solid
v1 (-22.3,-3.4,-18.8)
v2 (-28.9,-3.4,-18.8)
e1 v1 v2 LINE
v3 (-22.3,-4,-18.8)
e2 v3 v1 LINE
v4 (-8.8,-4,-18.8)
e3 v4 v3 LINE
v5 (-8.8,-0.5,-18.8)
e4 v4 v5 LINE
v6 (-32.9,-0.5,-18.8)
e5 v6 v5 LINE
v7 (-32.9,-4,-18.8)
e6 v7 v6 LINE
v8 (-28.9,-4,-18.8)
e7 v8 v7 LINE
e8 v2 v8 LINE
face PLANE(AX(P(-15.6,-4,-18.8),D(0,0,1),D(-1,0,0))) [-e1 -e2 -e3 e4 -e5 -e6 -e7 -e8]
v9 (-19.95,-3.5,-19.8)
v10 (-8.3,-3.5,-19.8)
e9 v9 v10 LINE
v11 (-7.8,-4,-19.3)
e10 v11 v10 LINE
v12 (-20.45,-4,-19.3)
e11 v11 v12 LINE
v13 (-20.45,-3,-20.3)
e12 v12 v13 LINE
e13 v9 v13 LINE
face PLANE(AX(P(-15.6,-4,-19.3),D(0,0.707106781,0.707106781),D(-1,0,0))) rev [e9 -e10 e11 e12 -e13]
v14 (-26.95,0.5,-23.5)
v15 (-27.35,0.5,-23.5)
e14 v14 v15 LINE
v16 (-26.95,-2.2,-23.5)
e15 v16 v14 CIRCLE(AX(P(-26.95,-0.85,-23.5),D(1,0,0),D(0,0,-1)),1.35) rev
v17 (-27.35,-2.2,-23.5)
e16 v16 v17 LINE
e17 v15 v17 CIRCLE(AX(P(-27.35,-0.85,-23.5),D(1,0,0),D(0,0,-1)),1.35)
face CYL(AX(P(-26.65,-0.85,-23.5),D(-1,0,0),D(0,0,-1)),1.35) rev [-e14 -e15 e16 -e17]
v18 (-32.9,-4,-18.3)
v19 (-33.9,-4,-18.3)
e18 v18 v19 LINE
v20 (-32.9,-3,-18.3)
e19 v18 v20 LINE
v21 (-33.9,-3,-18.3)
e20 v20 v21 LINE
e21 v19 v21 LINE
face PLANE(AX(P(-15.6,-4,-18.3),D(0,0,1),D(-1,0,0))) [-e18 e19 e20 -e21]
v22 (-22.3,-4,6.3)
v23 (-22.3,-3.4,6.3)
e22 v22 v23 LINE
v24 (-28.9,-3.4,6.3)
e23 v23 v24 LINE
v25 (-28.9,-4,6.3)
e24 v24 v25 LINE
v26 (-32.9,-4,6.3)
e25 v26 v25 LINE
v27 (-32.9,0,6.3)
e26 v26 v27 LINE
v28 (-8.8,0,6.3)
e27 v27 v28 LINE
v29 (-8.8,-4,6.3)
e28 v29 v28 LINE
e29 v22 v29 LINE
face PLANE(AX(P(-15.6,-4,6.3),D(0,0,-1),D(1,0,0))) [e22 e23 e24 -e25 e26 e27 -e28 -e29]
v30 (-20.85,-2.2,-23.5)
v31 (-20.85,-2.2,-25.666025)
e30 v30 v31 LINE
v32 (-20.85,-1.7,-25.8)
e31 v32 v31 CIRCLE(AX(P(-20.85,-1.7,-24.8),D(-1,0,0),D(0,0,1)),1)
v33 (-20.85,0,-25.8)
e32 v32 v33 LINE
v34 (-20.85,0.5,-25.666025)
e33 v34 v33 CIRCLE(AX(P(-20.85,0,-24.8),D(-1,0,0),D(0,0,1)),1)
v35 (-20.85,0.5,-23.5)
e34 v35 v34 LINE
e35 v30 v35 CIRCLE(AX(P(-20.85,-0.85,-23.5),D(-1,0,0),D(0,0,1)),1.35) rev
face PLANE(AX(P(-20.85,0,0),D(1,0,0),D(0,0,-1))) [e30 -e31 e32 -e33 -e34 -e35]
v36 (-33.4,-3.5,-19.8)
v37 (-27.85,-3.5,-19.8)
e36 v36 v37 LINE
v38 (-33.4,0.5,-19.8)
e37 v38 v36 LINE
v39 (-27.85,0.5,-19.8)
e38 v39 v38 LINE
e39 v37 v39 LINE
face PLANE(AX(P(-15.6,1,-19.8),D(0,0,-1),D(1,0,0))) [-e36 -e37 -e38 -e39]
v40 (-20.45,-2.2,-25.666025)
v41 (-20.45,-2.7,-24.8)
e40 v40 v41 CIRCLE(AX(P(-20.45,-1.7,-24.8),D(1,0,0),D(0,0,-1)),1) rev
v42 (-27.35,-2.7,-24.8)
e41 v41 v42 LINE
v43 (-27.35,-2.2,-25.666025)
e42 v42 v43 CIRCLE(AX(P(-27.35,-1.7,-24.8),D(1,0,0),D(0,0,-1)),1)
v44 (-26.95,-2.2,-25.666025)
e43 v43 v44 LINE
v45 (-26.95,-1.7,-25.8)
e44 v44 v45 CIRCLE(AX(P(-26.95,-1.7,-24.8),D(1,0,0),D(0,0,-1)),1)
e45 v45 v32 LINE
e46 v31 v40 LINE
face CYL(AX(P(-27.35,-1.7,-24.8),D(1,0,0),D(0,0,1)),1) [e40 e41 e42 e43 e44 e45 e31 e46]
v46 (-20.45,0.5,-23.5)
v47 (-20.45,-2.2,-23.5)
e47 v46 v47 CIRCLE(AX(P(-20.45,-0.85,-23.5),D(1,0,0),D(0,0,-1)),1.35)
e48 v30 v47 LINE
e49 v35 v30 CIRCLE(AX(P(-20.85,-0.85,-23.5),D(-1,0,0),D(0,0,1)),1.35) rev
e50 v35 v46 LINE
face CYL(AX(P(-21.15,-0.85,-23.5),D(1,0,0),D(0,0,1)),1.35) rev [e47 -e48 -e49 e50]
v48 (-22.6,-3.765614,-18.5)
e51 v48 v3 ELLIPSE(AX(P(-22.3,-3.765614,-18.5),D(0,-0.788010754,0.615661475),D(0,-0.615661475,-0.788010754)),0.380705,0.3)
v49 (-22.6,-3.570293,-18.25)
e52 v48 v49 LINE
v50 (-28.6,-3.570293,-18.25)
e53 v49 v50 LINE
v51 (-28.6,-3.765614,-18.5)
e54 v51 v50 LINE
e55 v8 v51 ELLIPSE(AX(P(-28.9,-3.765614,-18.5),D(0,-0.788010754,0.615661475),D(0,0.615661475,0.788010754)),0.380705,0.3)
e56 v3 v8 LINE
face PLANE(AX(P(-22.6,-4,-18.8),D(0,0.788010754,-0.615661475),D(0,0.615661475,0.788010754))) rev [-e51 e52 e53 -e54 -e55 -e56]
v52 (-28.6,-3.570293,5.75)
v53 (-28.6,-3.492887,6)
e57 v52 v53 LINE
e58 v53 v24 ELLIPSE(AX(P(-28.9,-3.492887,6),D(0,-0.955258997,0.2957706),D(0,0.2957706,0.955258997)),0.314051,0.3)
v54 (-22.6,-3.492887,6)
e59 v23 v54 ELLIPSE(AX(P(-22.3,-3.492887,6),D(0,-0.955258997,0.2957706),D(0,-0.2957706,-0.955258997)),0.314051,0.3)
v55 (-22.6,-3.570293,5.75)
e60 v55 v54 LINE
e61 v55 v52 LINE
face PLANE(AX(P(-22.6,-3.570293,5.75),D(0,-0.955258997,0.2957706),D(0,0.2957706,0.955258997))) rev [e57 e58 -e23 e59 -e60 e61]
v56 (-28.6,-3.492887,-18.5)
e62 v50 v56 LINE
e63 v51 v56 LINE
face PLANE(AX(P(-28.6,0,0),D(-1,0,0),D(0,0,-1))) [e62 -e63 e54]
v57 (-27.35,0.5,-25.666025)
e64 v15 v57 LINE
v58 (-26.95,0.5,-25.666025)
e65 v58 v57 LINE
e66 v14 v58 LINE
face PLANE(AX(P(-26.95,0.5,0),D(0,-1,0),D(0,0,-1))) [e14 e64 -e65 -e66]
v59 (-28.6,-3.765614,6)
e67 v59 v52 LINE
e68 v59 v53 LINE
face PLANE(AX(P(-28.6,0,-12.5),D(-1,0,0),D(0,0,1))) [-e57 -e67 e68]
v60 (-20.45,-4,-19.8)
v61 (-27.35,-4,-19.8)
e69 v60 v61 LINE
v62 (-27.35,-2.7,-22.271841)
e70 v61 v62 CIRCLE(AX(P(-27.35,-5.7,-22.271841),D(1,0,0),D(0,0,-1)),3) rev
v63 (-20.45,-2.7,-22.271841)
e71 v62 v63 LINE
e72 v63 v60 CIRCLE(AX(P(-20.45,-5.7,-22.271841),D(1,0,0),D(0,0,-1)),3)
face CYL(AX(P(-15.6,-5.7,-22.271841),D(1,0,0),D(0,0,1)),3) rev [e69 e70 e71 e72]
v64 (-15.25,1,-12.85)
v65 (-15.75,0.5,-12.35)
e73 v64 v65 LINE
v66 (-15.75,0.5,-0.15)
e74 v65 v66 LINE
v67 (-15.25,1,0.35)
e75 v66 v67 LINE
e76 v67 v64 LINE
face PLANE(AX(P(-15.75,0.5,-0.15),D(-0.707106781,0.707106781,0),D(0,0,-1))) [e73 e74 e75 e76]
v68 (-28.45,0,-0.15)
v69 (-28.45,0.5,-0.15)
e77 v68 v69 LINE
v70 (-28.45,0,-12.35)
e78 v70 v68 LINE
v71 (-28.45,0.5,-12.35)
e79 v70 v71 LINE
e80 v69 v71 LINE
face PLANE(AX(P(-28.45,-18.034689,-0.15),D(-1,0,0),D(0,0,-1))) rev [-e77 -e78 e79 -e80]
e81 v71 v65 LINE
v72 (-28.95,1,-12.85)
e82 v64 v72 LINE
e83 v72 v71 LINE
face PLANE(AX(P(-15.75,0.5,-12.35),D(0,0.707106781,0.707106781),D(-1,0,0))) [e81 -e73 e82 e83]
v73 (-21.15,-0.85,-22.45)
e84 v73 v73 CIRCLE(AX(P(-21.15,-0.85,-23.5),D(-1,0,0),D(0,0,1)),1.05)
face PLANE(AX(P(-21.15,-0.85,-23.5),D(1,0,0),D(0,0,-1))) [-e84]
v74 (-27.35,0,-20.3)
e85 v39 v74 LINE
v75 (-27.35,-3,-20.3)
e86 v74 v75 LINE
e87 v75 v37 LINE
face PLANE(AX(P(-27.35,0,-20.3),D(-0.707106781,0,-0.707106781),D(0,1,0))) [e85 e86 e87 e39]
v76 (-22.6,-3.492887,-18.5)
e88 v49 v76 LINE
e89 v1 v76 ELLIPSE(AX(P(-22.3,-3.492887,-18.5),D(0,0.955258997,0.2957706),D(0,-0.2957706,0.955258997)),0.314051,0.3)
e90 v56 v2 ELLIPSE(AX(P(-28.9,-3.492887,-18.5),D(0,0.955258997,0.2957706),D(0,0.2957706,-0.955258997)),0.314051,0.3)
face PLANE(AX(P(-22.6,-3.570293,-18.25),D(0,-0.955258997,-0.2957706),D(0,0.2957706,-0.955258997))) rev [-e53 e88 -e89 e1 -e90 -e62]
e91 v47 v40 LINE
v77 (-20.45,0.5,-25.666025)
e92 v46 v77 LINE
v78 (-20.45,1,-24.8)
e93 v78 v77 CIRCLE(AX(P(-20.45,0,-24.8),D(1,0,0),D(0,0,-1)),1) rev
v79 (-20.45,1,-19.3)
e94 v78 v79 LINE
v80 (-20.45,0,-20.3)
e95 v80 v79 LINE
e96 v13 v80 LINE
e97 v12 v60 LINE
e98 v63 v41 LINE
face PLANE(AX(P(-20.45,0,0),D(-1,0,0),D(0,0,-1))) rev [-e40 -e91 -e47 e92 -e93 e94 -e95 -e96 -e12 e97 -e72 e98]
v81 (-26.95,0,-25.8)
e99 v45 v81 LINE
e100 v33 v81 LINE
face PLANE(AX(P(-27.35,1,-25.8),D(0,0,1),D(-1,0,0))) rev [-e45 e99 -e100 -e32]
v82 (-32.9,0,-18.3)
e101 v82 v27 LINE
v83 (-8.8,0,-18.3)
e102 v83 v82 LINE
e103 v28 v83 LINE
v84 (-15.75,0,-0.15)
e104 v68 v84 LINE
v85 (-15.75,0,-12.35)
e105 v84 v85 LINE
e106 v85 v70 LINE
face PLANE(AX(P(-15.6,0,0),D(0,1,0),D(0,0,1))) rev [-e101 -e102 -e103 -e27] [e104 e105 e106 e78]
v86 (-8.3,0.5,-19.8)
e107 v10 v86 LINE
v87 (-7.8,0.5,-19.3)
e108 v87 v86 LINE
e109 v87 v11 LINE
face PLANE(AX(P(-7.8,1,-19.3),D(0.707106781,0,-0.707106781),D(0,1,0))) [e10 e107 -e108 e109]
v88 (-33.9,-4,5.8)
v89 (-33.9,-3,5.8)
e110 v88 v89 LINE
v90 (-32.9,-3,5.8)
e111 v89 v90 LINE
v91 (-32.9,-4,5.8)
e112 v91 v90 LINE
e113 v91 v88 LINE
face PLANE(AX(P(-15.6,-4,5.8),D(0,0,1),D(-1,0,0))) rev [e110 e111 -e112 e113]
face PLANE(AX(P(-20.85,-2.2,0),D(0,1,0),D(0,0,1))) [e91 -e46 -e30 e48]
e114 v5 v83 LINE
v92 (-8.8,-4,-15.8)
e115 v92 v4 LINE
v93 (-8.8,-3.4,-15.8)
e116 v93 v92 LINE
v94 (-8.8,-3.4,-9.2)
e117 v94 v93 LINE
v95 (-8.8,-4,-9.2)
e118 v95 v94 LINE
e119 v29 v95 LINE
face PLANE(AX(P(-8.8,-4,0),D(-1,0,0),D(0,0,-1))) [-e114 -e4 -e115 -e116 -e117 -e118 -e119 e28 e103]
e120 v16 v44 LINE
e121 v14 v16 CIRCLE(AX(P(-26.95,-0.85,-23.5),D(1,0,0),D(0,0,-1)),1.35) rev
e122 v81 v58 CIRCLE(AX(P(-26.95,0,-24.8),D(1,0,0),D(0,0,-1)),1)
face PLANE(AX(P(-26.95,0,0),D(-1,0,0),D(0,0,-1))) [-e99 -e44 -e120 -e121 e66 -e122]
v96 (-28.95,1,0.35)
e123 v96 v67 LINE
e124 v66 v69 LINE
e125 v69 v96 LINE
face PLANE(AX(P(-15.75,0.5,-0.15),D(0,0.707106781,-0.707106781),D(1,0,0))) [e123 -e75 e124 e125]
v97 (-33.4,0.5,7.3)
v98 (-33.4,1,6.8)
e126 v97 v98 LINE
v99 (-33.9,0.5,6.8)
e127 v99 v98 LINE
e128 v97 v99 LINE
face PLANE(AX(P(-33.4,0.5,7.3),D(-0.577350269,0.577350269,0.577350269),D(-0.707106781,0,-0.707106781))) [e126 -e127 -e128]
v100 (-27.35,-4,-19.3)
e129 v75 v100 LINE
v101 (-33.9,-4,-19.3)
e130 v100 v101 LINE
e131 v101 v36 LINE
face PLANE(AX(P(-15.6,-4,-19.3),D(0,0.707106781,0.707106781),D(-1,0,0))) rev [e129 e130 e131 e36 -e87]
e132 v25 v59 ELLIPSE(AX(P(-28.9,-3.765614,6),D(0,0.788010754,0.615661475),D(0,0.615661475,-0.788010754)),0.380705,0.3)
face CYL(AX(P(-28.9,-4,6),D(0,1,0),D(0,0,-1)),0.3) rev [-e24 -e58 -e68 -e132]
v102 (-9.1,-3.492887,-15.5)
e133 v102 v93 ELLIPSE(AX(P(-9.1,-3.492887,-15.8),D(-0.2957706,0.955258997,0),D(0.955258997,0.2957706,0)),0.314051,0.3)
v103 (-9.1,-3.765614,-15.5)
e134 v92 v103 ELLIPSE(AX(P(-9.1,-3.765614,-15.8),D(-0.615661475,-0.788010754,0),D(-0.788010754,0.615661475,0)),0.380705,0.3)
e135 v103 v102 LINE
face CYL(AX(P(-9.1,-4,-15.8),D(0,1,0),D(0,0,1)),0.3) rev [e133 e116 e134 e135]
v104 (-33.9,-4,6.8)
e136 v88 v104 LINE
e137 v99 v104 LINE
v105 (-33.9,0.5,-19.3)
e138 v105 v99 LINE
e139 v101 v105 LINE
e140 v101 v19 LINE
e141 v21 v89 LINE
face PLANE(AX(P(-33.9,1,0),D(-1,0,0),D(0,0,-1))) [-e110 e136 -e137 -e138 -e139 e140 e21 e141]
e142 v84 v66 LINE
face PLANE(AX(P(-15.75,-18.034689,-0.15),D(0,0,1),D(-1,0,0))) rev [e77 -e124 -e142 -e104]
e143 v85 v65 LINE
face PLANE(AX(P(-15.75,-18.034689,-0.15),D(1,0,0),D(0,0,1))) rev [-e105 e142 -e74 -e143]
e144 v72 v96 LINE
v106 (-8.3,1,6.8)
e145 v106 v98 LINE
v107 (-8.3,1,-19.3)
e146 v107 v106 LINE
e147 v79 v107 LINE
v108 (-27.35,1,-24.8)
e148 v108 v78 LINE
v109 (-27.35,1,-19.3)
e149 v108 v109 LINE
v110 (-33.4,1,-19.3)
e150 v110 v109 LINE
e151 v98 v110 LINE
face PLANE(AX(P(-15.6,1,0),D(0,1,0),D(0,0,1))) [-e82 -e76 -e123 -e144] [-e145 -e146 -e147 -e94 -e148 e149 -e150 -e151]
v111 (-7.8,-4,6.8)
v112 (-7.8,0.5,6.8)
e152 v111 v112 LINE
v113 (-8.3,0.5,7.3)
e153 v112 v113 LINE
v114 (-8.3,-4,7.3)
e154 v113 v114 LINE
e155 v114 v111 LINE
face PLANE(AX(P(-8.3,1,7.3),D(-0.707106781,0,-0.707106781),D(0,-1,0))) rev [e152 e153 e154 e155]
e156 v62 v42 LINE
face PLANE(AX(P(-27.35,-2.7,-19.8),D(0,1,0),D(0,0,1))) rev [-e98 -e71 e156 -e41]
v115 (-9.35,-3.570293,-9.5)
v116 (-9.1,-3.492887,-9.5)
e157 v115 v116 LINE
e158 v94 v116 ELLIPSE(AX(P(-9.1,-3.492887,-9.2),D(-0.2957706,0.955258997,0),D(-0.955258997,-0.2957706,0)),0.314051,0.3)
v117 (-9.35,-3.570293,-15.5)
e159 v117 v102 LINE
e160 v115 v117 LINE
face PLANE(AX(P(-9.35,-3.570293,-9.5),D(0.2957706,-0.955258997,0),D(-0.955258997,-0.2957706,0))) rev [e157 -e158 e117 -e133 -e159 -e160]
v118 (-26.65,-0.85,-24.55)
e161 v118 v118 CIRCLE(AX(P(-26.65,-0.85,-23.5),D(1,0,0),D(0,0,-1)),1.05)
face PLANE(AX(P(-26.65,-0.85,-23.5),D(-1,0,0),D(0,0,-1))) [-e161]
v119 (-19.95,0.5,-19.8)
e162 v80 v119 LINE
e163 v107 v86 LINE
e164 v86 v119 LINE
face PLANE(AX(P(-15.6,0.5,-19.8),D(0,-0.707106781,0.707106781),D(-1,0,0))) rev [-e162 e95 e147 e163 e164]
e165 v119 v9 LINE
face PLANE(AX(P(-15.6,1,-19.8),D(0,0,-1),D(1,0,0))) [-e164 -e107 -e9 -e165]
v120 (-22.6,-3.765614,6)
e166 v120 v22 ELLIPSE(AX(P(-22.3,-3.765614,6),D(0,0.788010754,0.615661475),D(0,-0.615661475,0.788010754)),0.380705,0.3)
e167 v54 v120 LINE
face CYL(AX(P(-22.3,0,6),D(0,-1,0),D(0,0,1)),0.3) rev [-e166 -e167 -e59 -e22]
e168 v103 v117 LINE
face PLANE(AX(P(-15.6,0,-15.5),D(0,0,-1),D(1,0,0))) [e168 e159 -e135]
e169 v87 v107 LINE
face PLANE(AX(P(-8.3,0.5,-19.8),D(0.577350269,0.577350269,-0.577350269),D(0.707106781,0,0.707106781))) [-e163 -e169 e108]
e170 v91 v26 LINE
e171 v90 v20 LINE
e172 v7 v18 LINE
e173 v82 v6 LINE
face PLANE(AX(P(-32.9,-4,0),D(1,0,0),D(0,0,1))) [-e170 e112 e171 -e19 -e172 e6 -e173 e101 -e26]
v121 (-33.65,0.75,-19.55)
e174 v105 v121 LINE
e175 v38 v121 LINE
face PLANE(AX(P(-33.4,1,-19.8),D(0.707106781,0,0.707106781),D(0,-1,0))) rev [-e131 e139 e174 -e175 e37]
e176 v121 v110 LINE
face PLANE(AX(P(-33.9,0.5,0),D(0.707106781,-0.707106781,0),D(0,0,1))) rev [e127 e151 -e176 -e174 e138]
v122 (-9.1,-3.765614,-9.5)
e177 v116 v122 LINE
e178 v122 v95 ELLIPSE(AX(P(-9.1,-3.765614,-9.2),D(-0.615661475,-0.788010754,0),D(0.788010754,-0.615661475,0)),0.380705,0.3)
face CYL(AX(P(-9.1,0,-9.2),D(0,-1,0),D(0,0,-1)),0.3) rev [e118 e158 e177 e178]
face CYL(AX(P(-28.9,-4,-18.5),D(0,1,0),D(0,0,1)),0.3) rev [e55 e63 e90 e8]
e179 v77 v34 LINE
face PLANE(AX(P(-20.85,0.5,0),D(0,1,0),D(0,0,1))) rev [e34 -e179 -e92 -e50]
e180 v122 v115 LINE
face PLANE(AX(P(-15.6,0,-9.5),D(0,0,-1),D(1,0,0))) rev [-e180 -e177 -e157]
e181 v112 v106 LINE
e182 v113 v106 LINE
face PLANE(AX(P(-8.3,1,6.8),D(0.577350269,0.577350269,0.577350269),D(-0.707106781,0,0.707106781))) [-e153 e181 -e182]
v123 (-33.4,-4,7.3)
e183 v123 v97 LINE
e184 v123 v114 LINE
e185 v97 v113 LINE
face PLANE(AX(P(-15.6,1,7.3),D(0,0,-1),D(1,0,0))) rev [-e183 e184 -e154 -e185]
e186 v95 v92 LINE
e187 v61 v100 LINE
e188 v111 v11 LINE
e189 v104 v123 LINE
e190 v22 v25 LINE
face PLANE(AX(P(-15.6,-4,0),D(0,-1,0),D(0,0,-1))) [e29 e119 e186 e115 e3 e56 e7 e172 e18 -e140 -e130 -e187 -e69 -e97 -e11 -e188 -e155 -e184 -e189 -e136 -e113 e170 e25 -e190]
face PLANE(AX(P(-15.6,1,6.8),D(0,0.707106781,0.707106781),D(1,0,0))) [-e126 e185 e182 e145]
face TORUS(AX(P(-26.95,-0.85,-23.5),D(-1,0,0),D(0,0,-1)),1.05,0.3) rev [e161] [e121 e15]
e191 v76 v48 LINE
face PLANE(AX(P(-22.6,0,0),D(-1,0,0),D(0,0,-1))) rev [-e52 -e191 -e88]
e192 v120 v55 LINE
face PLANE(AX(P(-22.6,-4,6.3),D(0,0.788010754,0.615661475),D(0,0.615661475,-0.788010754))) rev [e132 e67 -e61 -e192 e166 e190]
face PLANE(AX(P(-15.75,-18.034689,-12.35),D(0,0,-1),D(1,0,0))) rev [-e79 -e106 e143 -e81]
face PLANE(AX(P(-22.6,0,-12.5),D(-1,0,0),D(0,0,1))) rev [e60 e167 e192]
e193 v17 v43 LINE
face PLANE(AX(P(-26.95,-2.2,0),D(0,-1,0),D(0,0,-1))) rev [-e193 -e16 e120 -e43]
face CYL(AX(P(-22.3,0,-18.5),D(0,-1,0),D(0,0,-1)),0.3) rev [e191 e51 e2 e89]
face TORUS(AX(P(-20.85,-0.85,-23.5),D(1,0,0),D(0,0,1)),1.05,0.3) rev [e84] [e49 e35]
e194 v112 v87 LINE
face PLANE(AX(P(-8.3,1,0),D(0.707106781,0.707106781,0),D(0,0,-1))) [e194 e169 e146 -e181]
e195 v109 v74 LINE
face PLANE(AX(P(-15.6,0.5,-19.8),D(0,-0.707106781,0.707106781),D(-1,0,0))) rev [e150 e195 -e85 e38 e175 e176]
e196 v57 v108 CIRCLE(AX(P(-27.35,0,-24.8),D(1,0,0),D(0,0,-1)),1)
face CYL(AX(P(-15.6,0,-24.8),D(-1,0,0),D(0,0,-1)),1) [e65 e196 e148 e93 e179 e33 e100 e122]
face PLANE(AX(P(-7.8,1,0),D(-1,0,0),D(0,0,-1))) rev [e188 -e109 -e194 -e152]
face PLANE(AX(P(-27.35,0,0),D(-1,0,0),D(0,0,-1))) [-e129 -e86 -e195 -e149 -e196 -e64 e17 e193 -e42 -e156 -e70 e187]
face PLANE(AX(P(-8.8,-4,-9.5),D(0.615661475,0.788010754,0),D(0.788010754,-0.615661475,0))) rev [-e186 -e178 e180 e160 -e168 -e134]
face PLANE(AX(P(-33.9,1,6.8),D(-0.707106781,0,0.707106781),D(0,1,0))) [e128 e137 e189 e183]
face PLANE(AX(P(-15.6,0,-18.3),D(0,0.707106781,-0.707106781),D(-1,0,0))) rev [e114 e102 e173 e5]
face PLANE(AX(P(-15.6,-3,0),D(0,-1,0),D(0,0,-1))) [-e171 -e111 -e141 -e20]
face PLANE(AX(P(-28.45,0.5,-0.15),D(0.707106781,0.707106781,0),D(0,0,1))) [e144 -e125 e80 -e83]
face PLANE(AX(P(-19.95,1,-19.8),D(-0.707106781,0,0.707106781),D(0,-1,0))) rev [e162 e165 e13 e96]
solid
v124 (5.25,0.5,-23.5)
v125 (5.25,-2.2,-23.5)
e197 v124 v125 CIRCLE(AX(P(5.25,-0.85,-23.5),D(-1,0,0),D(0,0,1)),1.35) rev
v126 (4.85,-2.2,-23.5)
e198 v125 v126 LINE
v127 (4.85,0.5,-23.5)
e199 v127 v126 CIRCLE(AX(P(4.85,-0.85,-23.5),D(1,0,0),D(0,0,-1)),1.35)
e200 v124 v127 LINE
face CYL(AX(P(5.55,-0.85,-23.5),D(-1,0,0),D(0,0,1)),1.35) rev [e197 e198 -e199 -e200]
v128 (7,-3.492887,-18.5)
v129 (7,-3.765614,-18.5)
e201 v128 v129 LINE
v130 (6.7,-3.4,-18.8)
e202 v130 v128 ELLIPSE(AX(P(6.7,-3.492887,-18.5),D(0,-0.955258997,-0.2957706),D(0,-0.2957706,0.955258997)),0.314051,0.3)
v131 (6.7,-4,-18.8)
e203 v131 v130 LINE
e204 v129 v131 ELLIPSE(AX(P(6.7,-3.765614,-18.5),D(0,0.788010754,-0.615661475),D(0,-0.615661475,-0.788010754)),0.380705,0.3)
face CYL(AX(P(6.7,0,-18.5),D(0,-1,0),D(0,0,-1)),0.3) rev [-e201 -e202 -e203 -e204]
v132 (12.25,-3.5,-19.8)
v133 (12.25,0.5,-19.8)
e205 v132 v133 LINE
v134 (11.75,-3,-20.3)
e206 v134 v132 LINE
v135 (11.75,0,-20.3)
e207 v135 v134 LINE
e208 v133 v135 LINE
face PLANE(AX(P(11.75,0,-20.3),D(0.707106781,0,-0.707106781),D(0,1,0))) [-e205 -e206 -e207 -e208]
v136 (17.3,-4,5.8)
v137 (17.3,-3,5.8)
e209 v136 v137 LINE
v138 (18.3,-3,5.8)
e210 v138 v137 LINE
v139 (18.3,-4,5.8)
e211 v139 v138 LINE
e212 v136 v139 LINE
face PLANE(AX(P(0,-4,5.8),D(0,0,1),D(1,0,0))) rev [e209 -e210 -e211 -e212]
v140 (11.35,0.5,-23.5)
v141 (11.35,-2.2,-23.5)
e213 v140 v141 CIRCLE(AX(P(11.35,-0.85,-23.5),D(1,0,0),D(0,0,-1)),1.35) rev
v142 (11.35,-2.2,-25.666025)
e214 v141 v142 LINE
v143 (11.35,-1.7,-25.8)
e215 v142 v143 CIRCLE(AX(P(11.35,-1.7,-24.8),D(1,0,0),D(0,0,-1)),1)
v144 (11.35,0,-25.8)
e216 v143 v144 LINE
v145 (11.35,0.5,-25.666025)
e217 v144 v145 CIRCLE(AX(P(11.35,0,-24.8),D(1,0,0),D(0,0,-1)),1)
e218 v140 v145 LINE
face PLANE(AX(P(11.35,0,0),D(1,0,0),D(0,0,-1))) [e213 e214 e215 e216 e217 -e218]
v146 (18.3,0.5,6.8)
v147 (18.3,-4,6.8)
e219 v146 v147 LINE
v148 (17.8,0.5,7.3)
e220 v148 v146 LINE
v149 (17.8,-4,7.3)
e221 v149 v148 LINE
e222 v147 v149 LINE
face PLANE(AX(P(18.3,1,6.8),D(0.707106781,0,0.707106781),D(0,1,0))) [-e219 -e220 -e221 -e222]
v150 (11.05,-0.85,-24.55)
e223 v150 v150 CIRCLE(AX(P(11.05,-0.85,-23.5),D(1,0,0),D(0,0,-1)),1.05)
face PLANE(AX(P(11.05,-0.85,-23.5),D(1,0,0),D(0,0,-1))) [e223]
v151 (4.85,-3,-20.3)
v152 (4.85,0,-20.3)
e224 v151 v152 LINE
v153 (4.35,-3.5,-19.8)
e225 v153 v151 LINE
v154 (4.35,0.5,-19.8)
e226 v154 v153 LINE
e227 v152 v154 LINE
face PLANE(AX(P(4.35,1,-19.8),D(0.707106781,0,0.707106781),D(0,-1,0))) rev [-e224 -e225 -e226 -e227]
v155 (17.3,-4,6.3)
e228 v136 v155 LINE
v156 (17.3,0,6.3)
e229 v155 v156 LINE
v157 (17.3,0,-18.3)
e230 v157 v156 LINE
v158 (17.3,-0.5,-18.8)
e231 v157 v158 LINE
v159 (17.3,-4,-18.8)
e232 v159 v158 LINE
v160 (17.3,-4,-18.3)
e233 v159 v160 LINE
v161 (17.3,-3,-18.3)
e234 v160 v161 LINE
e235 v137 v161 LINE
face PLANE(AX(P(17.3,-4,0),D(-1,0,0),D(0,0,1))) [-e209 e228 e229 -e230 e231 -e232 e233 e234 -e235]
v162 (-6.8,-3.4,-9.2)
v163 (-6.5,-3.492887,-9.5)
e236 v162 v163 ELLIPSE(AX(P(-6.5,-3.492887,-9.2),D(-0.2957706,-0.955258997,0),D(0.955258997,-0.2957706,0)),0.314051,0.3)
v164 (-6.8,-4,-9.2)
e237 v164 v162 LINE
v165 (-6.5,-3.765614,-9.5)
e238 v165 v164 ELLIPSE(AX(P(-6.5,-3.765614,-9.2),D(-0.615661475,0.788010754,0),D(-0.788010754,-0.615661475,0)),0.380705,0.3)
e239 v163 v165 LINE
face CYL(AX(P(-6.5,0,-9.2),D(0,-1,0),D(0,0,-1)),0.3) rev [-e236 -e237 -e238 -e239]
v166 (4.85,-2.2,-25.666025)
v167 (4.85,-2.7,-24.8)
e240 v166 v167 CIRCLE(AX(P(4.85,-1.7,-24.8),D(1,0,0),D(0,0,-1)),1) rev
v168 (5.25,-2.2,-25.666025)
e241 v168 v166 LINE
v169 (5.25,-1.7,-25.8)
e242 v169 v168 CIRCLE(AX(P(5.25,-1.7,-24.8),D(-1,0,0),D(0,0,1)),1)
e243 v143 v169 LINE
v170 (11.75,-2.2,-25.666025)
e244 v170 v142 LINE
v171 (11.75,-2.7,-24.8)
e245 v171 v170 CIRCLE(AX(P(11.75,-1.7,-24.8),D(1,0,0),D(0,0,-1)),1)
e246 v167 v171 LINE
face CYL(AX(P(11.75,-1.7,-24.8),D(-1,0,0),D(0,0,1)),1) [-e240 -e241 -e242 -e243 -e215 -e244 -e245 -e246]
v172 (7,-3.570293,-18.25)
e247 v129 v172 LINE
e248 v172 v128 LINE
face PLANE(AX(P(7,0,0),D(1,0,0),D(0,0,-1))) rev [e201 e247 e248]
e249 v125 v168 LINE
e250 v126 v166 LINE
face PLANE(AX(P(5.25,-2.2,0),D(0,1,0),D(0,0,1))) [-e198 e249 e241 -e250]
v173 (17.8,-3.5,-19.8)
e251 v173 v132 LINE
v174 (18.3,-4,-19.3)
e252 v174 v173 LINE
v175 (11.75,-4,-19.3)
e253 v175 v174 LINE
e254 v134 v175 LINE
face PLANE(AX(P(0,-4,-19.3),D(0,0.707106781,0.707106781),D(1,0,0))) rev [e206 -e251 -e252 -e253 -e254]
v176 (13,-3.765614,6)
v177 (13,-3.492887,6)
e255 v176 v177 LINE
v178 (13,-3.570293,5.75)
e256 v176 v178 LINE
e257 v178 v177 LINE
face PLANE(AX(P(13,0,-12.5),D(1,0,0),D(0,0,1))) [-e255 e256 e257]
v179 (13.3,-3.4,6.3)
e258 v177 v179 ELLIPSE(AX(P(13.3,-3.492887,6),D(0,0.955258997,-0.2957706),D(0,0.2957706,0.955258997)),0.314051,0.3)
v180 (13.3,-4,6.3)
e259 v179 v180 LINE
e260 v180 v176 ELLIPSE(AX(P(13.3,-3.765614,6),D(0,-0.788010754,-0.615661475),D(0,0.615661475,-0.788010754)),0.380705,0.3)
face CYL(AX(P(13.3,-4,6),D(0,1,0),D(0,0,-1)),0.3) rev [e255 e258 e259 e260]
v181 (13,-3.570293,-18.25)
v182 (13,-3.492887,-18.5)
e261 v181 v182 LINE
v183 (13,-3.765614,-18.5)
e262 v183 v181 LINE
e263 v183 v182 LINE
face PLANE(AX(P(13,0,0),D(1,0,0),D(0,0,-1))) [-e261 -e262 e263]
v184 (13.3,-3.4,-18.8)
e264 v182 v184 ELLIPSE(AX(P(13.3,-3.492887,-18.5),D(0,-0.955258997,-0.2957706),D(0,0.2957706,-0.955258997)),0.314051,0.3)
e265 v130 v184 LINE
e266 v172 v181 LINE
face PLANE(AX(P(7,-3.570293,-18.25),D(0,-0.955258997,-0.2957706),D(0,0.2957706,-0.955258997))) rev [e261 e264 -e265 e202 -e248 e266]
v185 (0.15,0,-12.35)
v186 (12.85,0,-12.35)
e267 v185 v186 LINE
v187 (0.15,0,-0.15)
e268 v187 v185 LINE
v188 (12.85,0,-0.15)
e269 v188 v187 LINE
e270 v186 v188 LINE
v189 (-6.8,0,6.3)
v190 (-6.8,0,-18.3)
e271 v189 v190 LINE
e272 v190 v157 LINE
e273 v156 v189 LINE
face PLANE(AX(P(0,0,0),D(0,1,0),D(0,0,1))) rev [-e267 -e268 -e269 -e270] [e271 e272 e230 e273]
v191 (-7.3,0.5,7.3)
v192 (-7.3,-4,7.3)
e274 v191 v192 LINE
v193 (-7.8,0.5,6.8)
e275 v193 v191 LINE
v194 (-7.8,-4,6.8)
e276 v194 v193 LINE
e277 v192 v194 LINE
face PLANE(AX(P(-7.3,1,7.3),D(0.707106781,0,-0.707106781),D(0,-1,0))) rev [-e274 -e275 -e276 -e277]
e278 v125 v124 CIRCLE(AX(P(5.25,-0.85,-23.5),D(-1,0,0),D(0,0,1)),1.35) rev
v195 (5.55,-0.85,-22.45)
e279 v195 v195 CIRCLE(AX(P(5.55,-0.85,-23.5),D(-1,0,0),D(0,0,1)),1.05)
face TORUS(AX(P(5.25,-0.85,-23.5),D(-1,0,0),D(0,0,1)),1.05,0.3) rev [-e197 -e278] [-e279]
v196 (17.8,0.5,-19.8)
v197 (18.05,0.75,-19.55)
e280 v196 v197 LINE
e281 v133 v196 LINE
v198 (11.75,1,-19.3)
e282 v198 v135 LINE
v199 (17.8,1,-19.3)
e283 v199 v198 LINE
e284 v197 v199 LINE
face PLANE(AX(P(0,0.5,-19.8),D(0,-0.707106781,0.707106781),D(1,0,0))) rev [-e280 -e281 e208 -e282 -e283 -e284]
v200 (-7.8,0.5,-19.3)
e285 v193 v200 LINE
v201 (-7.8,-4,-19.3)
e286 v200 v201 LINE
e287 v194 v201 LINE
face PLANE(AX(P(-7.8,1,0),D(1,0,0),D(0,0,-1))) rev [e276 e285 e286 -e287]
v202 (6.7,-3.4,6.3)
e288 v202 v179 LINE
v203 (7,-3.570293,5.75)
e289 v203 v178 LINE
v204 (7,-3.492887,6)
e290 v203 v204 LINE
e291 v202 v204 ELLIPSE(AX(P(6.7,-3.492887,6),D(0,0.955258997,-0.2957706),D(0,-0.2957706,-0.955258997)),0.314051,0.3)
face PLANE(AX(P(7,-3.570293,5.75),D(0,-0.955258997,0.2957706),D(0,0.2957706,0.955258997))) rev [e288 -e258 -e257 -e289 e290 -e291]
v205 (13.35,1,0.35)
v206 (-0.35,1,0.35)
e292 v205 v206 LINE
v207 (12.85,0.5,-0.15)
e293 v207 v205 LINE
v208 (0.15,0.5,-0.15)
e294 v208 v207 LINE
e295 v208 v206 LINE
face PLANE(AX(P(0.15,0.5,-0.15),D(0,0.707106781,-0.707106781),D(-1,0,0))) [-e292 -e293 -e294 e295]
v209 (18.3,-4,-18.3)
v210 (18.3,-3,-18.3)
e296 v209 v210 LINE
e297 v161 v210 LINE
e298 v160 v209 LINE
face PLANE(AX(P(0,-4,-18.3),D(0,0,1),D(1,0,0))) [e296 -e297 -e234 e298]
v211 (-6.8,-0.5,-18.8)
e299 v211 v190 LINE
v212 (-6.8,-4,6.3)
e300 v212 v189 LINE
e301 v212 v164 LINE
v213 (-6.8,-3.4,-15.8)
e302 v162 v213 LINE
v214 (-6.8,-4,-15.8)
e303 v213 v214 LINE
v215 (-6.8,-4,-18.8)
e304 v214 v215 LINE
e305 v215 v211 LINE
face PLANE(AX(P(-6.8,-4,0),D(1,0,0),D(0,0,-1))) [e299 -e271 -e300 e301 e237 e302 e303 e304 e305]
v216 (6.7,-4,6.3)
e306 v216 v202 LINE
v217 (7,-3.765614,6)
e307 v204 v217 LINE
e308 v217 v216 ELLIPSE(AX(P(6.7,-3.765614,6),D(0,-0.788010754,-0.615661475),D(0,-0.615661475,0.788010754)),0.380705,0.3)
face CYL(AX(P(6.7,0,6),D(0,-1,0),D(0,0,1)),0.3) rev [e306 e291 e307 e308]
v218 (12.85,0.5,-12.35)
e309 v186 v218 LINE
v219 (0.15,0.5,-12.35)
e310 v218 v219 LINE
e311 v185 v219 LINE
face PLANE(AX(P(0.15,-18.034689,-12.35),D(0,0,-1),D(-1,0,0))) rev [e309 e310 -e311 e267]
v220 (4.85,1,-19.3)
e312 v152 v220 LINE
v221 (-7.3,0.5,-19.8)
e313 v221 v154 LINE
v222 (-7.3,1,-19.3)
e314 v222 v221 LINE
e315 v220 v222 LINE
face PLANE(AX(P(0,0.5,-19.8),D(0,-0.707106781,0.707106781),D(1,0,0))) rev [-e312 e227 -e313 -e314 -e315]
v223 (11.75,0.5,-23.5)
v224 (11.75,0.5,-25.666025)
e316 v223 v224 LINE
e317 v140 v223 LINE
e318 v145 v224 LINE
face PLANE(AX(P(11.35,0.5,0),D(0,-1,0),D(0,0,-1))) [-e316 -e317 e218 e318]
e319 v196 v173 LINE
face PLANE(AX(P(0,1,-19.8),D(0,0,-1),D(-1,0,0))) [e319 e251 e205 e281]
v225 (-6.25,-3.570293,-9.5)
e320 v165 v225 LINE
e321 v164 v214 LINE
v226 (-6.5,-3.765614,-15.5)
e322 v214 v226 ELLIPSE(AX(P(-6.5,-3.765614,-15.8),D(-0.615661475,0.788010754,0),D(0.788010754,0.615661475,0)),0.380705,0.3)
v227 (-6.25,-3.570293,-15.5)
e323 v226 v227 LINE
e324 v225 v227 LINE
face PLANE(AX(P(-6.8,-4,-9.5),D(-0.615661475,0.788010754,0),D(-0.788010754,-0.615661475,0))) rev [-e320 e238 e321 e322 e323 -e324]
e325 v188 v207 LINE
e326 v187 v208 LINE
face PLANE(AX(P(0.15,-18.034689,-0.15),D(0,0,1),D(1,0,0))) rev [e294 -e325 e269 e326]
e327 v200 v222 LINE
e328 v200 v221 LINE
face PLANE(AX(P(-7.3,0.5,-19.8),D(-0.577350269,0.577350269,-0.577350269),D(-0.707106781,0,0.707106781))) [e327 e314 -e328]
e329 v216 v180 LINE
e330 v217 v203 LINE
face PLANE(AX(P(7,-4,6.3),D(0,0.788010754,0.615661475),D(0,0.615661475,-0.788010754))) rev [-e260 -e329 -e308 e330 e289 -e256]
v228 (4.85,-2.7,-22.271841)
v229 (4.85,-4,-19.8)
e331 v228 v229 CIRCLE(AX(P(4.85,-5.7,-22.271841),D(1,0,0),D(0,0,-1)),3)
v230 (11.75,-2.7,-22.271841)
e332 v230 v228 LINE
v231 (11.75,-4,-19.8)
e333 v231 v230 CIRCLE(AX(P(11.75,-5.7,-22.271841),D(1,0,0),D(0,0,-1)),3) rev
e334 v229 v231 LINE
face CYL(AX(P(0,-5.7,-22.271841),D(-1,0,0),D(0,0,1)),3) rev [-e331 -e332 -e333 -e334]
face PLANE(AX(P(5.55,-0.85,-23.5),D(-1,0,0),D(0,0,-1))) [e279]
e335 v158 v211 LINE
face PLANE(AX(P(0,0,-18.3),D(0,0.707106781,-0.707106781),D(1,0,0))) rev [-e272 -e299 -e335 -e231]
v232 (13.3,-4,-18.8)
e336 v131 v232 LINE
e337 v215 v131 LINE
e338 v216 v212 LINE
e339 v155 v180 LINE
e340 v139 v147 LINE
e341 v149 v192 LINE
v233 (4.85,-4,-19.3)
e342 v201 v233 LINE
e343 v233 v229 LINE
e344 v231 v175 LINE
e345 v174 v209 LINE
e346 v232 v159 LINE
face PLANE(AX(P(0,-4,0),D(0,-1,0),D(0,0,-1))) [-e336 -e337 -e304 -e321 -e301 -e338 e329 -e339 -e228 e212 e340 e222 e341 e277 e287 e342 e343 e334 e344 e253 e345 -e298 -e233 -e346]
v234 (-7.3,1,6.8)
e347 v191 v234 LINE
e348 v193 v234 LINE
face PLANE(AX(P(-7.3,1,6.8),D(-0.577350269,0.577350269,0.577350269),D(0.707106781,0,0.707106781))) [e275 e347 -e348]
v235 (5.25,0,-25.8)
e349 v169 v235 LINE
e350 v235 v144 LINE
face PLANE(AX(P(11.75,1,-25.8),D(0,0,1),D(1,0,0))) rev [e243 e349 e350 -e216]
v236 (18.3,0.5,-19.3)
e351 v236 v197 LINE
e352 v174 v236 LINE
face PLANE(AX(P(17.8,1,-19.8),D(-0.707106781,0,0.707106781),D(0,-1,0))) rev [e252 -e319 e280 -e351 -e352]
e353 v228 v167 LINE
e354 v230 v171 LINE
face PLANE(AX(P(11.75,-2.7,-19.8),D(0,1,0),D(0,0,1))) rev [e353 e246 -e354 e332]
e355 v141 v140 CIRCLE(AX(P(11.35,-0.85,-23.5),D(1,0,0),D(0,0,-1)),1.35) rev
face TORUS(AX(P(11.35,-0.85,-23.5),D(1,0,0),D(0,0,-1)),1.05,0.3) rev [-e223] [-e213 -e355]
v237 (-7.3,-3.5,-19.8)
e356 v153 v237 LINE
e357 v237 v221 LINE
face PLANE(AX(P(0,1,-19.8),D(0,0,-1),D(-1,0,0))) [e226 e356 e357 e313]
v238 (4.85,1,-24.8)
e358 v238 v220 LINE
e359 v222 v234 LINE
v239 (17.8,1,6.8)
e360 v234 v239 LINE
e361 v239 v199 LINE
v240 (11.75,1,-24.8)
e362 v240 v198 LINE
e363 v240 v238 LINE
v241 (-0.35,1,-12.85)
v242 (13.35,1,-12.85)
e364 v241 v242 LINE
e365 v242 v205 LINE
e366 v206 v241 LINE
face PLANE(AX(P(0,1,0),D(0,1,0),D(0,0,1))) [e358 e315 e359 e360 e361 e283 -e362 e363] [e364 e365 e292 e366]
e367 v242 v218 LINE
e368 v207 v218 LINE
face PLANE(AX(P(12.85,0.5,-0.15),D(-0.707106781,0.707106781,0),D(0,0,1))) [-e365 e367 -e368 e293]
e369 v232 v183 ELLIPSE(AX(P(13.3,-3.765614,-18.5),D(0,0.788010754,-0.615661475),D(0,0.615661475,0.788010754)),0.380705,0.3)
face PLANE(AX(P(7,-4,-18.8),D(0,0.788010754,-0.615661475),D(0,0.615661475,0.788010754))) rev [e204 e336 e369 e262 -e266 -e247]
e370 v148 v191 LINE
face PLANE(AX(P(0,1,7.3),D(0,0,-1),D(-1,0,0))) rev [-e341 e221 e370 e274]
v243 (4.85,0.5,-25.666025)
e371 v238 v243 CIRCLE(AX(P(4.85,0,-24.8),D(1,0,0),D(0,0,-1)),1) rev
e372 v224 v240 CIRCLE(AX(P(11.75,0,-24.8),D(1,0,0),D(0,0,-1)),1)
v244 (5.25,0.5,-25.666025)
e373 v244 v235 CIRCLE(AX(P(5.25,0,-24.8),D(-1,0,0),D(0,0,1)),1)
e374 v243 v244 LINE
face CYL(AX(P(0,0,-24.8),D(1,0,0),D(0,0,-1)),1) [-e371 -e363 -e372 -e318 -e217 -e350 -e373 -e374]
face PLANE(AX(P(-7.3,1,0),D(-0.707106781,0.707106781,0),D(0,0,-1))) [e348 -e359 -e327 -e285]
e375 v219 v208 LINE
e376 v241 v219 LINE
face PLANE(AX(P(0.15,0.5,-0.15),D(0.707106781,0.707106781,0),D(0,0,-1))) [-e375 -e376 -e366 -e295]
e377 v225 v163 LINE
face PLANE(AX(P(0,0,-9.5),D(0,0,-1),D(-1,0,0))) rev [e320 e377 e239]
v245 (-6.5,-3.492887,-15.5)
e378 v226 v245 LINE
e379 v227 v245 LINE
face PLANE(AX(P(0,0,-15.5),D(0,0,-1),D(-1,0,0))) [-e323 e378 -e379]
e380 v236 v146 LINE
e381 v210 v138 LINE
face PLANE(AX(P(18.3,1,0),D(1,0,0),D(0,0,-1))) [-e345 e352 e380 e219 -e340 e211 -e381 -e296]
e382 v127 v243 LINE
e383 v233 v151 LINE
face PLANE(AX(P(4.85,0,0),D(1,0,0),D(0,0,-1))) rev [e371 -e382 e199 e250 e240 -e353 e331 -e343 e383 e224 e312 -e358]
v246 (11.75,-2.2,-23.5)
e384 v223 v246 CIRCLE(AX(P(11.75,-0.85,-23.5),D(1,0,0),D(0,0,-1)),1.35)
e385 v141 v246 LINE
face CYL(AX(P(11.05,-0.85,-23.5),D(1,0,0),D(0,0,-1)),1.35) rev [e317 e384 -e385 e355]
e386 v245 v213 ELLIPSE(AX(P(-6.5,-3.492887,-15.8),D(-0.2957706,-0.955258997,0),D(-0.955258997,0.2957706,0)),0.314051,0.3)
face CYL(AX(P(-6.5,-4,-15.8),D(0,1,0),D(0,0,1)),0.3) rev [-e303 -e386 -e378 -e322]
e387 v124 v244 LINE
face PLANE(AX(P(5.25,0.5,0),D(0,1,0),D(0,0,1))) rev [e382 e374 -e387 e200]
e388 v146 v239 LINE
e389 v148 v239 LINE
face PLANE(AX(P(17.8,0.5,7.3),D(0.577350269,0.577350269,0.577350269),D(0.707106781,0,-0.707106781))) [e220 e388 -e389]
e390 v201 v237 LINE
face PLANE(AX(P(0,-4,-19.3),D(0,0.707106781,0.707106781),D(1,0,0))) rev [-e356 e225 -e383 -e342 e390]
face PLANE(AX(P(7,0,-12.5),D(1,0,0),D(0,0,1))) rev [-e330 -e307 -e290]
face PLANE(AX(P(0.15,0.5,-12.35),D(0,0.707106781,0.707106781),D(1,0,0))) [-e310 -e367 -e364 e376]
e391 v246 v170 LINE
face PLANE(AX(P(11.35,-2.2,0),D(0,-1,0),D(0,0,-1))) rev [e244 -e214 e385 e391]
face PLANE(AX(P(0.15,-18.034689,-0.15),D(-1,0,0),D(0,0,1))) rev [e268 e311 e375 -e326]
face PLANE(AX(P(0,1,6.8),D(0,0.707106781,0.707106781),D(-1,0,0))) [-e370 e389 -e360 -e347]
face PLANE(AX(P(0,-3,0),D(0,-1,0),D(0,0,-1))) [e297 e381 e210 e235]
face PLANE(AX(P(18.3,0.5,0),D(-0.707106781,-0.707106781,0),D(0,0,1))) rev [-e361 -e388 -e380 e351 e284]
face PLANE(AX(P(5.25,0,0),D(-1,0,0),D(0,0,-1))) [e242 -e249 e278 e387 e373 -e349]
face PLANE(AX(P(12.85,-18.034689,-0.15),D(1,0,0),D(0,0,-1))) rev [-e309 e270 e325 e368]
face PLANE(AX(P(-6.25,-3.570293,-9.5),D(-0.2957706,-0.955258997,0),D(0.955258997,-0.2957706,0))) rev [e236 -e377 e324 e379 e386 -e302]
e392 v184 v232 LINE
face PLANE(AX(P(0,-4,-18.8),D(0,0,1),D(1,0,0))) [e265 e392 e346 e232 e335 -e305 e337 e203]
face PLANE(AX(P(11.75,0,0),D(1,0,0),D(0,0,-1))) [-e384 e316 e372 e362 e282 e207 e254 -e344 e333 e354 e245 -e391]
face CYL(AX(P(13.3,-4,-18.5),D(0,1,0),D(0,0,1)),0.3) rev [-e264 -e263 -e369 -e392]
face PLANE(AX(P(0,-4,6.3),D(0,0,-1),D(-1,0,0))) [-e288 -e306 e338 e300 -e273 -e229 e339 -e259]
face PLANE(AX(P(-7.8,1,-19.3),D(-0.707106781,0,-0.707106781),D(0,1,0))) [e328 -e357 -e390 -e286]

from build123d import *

# Parameters (mm, degrees)
SKETCH1_W            = 26.1
SKETCH1_H            = 27.1
SKETCH1_W_2          = 13
SKETCH1_H_2          = 12.5
BOSS_EXTRUDE1_DEPTH  = 1
BOSS_EXTRUDE2_DEPTH  = 4
SKETCH3_W            = 1
SKETCH3_H            = 24.1
BOSS_EXTRUDE3_DEPTH  = 3
BOSS_EXTRUDE4_DEPTH  = 3
FILLET1_R            = 0.3
BOSS_EXTRUDE5_DEPTH  = 6
FILLET2_R            = 0.3
FILLET2_OF_MIRROR2_R = 0.3
SKETCH8_W            = 13
SKETCH8_H            = 12.5
SKETCH8_W_2          = 12.7
SKETCH8_H_2          = 12.2
BOSS_EXTRUDE6_DEPTH  = 1
SKETCH9_W            = 6
SKETCH9_H            = 3.7
BOSS_EXTRUDE7_DEPTH  = 3.45
SKETCH11_R           = 1.35
CUT_EXTRUDE1_DEPTH   = 0.7
FILLET3_R            = 0.3
CUT_EXTRUDE3_DEPTH   = 0.4
FILLET4_R            = 3
MIRROR3_START        = -2.2
MIRROR3_2_OUTLINE_W  = 0.4
MIRROR3_2_OUTLINE_H  = 2.3
MIRROR3_2_DEPTH      = 2.7
FILLET5_R            = 1
CHAMFER1_SIZE        = 0.5
CHAMFER2_SIZE        = 0.5
CHAMFER4_SIZE        = 0.5


with BuildPart() as part:
    # Sketch1 → Boss-Extrude1 (new body)
    with BuildSketch(Plane(origin=(0, 0, 0), x_dir=(1, 0, 0), z_dir=(0, 1, 0))):
        with Locations((5.25, 6.25)):
            Rectangle(SKETCH1_W, SKETCH1_H)
        with Locations((6.5, 6.25)):
            Rectangle(SKETCH1_W_2, SKETCH1_H_2, mode=Mode.SUBTRACT)
    extrude(amount=BOSS_EXTRUDE1_DEPTH)

    # Sketch2 → Boss-Extrude2 (add)
    with BuildSketch(Plane.XZ):
        Polygon((-7.8, 7.3), (-7.8, -19.8), (18.3, -19.8), (18.3, -18.3), (17.3, -18.3), (17.3, -18.8), (-6.8, -18.8), (-6.8, 6.3), (17.3, 6.3), (17.3, 5.8), (18.3, 5.8), (18.3, 7.3), align=None)
    extrude(amount=BOSS_EXTRUDE2_DEPTH)

    # Sketch3 → Boss-Extrude3 (add)
    with BuildSketch(Plane.XZ):
        with Locations((17.8, -6.25)):
            Rectangle(SKETCH3_W, SKETCH3_H)
    extrude(amount=BOSS_EXTRUDE3_DEPTH)

    # Sketch4 → Boss-Extrude4 (add, symmetric)
    with BuildSketch(Plane.XY.offset(-12.5)):
        Polygon((-6.8, -4), (-6.25, -3.570292905), (-6.8, -3.4), align=None)
    extrude(amount=BOSS_EXTRUDE4_DEPTH, both=True)

    # Fillet1
    # the kernel refuses this fillet: 0.3 mm, written as the material it adds along each edge
    with BuildSketch(Plane(origin=(-6.8, -2.65, -15.5), x_dir=(0, 0, -1), z_dir=(0, -1, 0))) as fillet1_piece_1_section:
        with BuildLine():
            CenterArc((FILLET1_R, FILLET1_R), FILLET1_R, 180, 90)
            Line((0, FILLET1_R), (0, 0))
            Line((0, 0), (FILLET1_R, 0))
        make_face()
    fillet1_piece_1 = extrude(amount=1.35, mode=Mode.PRIVATE)
    fillet1_piece_1 = split(fillet1_piece_1, bisect_by=Plane(origin=(-7.011903145, -3.334389814, -15.5), z_dir=(-0.2957706001702403, -0.9552589973797346, 0)), keep=Keep.TOP, mode=Mode.PRIVATE)
    fillet1_piece_1 = split(fillet1_piece_1, bisect_by=Plane(origin=(-6.145050385, -3.48829728, -15.5), z_dir=(-0.6156614753256621, 0.7880107536067191, 0)), keep=Keep.TOP, mode=Mode.PRIVATE)
    add(fillet1_piece_1)
    with BuildSketch(Plane(origin=(-6.8, -2.65, -9.5), x_dir=(0, 0, 1), z_dir=(0, -1, 0))) as fillet1_piece_2_section:
        with BuildLine():
            CenterArc((FILLET1_R, -FILLET1_R), FILLET1_R, 90, 90)
            Line((0, -FILLET1_R), (0, 0))
            Line((0, 0), (FILLET1_R, 0))
        make_face()
    fillet1_piece_2 = extrude(amount=1.35, mode=Mode.PRIVATE)
    fillet1_piece_2 = split(fillet1_piece_2, bisect_by=Plane(origin=(-7.011903145, -3.334389814, -9.5), z_dir=(-0.2957706001702403, -0.9552589973797346, 0)), keep=Keep.TOP, mode=Mode.PRIVATE)
    fillet1_piece_2 = split(fillet1_piece_2, bisect_by=Plane(origin=(-6.145050385, -3.48829728, -9.5), z_dir=(-0.6156614753256621, 0.7880107536067191, 0)), keep=Keep.TOP, mode=Mode.PRIVATE)
    add(fillet1_piece_2)

    # Sketch6 → Boss-Extrude5 (add)
    with BuildSketch(Plane.ZY.offset(-13)):
        Polygon((-18.8, -4), (-18.25, -3.570292905), (-18.8, -3.4), align=None)
    boss_extrude5 = extrude(amount=BOSS_EXTRUDE5_DEPTH)

    # Fillet2
    fillet2_edges = [part.edges().sort_by_distance(p)[0] for p in [
        (13, -3.7, -18.8),
        (7, -3.7, -18.8),
    ]]
    fillet(fillet2_edges, radius=FILLET2_R)

    # Mirror2: Boss-Extrude5 across plane
    add(boss_extrude5.mirror(Plane(origin=(0, 0, -6.25), x_dir=(1, 0, 0), z_dir=(0, 0, -1))))

    # Fillet2 of Mirror2
    fillet2_of_mirror2_edges = [part.edges().sort_by_distance(p)[0] for p in [
        (13, -3.7, 6.3),
        (7, -3.7, 6.3),
    ]]
    fillet(fillet2_of_mirror2_edges, radius=FILLET2_OF_MIRROR2_R)

    # Sketch8 → Boss-Extrude6 (add)
    with BuildSketch(Plane(origin=(0, 1, 0), x_dir=(1, 0, 0), z_dir=(0, 1, 0))):
        with Locations((6.5, 6.25)):
            Rectangle(SKETCH8_W, SKETCH8_H)
        with Locations((6.5, 6.25)):
            Rectangle(SKETCH8_W_2, SKETCH8_H_2, mode=Mode.SUBTRACT)
    extrude(amount=-BOSS_EXTRUDE6_DEPTH)

    # Sketch9 → Boss-Extrude7 (add, symmetric)
    with BuildSketch(Plane(origin=(8.3, 0, 0), x_dir=(0, 0, -1), z_dir=(1, 0, 0))):
        with Locations((22.8, -0.85)):
            Rectangle(SKETCH9_W, SKETCH9_H)
    extrude(amount=BOSS_EXTRUDE7_DEPTH, both=True)

    # Sketch11 → Cut-Extrude1 (cut)
    with BuildSketch(Plane(origin=(11.75, 0, 0), x_dir=(0, 0, -1), z_dir=(1, 0, 0))):
        with Locations((23.5, -0.85)):
            Circle(SKETCH11_R)
    extrude(amount=-CUT_EXTRUDE1_DEPTH, mode=Mode.SUBTRACT)

    # Fillet3
    fillet3_edges = [part.edges().sort_by_distance(p)[0] for p in [
        (11.05, -0.85, -22.15),
    ]]
    fillet(fillet3_edges, radius=FILLET3_R)

    # Sketch13 → Cut-Extrude3 (cut)
    with BuildSketch(Plane(origin=(11.75, 0, 0), x_dir=(0, 0, -1), z_dir=(1, 0, 0))):
        with BuildLine():
            Line((23.5, -2.2), (25.8, -2.2))
            Line((25.8, -2.2), (25.8, 0.5))
            Line((25.8, 0.5), (23.5, 0.5))
            ThreePointArc((23.5, 0.5), (24.454594155, 0.104594155), (24.85, -0.85))
            ThreePointArc((24.85, -0.85), (24.454594155, -1.804594155), (23.5, -2.2))
        make_face()
    extrude(amount=-CUT_EXTRUDE3_DEPTH, mode=Mode.SUBTRACT)

    # Fillet4
    # the kernel refuses this fillet: 3 mm, written as the material it adds along each edge
    with BuildSketch(Plane(origin=(4.85, -2.7, -19.8), x_dir=(0, 0, -1), z_dir=(1, 0, 0))) as fillet4_piece_1:
        with BuildLine():
            CenterArc((2.471841419, -3), FILLET4_R, 90, 55.481892159)
            Line((0, -1.3), (-0.049436828, -1.266))
            ThreePointArc((-0.049436828, -1.266), (-0.06, -0.65), (-0.06, 0))
            Line((-0.06, 0), (0, 0.06))
            Line((0, 0.06), (2.471841419, 0.06))
            Line((2.471841419, 0.06), (2.471841419, 0))
        make_face()
    extrude(amount=6.9)

    # Mirror3: read off the stored shape, not the designer's step
    # Mirror3 outline → Mirror3 (revolve, cut)
    with BuildSketch(Plane(origin=(0, -0.85, -23.5), x_dir=(0, 1, 0), z_dir=(0, 0, -1))):
        with BuildLine():
            Line((0, 5.55), (0, 4.85))
            Line((0, 4.85), (1.35, 4.85))
            Line((1.35, 4.85), (1.35, 5.25))
            ThreePointArc((1.35, 5.25), (1.262132034, 5.462132034), (1.05, 5.55))
            Line((1.05, 5.55), (0, 5.55))
        make_face()
    revolve(axis=Axis((0, -0.85, -23.5), (1, 0, 0)), mode=Mode.SUBTRACT)

    # Mirror3 2 outline → Mirror3 2 (cut)
    with BuildSketch(Plane(origin=(0, 0, 0), x_dir=(1, 0, 0), z_dir=(0, 1, 0)).offset(MIRROR3_START)):
        with Locations((5.05, 24.65)):
            Rectangle(MIRROR3_2_OUTLINE_W, MIRROR3_2_OUTLINE_H)
    extrude(amount=MIRROR3_2_DEPTH, mode=Mode.SUBTRACT)

    # Fillet5
    fillet5_edges = [part.edges().sort_by_distance(p)[0] for p in [
        (8.3, -2.7, -25.8),
        (8.3, 1, -25.8),
    ]]
    fillet(fillet5_edges, radius=FILLET5_R)

    # Chamfer1
    chamfer1_edges = [part.edges().sort_by_distance(p)[0] for p in [
        (-7.8, 1, -6.25),
        (5.25, 1, 7.3),
        (18.3, -1.5, -19.8),
        (18.3, -1.5, 7.3),
        (-7.8, -1.5, 7.3),
        (-7.8, -1.5, -19.8),
        (6.5, 1, -0.15),
        (12.85, 1, -6.25),
        (6.5, 1, -12.35),
        (0.15, 1, -6.25),
        (18.3, 1, -6.25),
        (15.025, -4, -19.8),
        (-1.475, -4, -19.8),
        (-1.475, 1, -19.8),
        (5.25, 0, -18.8),
    ]]
    chamfer(chamfer1_edges, length=CHAMFER1_SIZE)

    # Chamfer2
    chamfer2_edges = [part.edges().sort_by_distance(p)[0] for p in [
        (14.775, 1, -19.8),
    ]]
    chamfer(chamfer2_edges, length=CHAMFER2_SIZE)

    # Chamfer4
    chamfer4_edges = [part.edges().sort_by_distance(p)[0] for p in [
        (4.85, -1.5, -19.8),
        (11.75, -1.5, -19.8),
    ]]
    chamfer(chamfer4_edges, length=CHAMFER4_SIZE)


with BuildPart() as body_2:
    # Mirror4: mirrored copy
    add(part.part.mirror(Plane.ZY.offset(7.8)))


solid = Compound([part.part, body_2.part])
